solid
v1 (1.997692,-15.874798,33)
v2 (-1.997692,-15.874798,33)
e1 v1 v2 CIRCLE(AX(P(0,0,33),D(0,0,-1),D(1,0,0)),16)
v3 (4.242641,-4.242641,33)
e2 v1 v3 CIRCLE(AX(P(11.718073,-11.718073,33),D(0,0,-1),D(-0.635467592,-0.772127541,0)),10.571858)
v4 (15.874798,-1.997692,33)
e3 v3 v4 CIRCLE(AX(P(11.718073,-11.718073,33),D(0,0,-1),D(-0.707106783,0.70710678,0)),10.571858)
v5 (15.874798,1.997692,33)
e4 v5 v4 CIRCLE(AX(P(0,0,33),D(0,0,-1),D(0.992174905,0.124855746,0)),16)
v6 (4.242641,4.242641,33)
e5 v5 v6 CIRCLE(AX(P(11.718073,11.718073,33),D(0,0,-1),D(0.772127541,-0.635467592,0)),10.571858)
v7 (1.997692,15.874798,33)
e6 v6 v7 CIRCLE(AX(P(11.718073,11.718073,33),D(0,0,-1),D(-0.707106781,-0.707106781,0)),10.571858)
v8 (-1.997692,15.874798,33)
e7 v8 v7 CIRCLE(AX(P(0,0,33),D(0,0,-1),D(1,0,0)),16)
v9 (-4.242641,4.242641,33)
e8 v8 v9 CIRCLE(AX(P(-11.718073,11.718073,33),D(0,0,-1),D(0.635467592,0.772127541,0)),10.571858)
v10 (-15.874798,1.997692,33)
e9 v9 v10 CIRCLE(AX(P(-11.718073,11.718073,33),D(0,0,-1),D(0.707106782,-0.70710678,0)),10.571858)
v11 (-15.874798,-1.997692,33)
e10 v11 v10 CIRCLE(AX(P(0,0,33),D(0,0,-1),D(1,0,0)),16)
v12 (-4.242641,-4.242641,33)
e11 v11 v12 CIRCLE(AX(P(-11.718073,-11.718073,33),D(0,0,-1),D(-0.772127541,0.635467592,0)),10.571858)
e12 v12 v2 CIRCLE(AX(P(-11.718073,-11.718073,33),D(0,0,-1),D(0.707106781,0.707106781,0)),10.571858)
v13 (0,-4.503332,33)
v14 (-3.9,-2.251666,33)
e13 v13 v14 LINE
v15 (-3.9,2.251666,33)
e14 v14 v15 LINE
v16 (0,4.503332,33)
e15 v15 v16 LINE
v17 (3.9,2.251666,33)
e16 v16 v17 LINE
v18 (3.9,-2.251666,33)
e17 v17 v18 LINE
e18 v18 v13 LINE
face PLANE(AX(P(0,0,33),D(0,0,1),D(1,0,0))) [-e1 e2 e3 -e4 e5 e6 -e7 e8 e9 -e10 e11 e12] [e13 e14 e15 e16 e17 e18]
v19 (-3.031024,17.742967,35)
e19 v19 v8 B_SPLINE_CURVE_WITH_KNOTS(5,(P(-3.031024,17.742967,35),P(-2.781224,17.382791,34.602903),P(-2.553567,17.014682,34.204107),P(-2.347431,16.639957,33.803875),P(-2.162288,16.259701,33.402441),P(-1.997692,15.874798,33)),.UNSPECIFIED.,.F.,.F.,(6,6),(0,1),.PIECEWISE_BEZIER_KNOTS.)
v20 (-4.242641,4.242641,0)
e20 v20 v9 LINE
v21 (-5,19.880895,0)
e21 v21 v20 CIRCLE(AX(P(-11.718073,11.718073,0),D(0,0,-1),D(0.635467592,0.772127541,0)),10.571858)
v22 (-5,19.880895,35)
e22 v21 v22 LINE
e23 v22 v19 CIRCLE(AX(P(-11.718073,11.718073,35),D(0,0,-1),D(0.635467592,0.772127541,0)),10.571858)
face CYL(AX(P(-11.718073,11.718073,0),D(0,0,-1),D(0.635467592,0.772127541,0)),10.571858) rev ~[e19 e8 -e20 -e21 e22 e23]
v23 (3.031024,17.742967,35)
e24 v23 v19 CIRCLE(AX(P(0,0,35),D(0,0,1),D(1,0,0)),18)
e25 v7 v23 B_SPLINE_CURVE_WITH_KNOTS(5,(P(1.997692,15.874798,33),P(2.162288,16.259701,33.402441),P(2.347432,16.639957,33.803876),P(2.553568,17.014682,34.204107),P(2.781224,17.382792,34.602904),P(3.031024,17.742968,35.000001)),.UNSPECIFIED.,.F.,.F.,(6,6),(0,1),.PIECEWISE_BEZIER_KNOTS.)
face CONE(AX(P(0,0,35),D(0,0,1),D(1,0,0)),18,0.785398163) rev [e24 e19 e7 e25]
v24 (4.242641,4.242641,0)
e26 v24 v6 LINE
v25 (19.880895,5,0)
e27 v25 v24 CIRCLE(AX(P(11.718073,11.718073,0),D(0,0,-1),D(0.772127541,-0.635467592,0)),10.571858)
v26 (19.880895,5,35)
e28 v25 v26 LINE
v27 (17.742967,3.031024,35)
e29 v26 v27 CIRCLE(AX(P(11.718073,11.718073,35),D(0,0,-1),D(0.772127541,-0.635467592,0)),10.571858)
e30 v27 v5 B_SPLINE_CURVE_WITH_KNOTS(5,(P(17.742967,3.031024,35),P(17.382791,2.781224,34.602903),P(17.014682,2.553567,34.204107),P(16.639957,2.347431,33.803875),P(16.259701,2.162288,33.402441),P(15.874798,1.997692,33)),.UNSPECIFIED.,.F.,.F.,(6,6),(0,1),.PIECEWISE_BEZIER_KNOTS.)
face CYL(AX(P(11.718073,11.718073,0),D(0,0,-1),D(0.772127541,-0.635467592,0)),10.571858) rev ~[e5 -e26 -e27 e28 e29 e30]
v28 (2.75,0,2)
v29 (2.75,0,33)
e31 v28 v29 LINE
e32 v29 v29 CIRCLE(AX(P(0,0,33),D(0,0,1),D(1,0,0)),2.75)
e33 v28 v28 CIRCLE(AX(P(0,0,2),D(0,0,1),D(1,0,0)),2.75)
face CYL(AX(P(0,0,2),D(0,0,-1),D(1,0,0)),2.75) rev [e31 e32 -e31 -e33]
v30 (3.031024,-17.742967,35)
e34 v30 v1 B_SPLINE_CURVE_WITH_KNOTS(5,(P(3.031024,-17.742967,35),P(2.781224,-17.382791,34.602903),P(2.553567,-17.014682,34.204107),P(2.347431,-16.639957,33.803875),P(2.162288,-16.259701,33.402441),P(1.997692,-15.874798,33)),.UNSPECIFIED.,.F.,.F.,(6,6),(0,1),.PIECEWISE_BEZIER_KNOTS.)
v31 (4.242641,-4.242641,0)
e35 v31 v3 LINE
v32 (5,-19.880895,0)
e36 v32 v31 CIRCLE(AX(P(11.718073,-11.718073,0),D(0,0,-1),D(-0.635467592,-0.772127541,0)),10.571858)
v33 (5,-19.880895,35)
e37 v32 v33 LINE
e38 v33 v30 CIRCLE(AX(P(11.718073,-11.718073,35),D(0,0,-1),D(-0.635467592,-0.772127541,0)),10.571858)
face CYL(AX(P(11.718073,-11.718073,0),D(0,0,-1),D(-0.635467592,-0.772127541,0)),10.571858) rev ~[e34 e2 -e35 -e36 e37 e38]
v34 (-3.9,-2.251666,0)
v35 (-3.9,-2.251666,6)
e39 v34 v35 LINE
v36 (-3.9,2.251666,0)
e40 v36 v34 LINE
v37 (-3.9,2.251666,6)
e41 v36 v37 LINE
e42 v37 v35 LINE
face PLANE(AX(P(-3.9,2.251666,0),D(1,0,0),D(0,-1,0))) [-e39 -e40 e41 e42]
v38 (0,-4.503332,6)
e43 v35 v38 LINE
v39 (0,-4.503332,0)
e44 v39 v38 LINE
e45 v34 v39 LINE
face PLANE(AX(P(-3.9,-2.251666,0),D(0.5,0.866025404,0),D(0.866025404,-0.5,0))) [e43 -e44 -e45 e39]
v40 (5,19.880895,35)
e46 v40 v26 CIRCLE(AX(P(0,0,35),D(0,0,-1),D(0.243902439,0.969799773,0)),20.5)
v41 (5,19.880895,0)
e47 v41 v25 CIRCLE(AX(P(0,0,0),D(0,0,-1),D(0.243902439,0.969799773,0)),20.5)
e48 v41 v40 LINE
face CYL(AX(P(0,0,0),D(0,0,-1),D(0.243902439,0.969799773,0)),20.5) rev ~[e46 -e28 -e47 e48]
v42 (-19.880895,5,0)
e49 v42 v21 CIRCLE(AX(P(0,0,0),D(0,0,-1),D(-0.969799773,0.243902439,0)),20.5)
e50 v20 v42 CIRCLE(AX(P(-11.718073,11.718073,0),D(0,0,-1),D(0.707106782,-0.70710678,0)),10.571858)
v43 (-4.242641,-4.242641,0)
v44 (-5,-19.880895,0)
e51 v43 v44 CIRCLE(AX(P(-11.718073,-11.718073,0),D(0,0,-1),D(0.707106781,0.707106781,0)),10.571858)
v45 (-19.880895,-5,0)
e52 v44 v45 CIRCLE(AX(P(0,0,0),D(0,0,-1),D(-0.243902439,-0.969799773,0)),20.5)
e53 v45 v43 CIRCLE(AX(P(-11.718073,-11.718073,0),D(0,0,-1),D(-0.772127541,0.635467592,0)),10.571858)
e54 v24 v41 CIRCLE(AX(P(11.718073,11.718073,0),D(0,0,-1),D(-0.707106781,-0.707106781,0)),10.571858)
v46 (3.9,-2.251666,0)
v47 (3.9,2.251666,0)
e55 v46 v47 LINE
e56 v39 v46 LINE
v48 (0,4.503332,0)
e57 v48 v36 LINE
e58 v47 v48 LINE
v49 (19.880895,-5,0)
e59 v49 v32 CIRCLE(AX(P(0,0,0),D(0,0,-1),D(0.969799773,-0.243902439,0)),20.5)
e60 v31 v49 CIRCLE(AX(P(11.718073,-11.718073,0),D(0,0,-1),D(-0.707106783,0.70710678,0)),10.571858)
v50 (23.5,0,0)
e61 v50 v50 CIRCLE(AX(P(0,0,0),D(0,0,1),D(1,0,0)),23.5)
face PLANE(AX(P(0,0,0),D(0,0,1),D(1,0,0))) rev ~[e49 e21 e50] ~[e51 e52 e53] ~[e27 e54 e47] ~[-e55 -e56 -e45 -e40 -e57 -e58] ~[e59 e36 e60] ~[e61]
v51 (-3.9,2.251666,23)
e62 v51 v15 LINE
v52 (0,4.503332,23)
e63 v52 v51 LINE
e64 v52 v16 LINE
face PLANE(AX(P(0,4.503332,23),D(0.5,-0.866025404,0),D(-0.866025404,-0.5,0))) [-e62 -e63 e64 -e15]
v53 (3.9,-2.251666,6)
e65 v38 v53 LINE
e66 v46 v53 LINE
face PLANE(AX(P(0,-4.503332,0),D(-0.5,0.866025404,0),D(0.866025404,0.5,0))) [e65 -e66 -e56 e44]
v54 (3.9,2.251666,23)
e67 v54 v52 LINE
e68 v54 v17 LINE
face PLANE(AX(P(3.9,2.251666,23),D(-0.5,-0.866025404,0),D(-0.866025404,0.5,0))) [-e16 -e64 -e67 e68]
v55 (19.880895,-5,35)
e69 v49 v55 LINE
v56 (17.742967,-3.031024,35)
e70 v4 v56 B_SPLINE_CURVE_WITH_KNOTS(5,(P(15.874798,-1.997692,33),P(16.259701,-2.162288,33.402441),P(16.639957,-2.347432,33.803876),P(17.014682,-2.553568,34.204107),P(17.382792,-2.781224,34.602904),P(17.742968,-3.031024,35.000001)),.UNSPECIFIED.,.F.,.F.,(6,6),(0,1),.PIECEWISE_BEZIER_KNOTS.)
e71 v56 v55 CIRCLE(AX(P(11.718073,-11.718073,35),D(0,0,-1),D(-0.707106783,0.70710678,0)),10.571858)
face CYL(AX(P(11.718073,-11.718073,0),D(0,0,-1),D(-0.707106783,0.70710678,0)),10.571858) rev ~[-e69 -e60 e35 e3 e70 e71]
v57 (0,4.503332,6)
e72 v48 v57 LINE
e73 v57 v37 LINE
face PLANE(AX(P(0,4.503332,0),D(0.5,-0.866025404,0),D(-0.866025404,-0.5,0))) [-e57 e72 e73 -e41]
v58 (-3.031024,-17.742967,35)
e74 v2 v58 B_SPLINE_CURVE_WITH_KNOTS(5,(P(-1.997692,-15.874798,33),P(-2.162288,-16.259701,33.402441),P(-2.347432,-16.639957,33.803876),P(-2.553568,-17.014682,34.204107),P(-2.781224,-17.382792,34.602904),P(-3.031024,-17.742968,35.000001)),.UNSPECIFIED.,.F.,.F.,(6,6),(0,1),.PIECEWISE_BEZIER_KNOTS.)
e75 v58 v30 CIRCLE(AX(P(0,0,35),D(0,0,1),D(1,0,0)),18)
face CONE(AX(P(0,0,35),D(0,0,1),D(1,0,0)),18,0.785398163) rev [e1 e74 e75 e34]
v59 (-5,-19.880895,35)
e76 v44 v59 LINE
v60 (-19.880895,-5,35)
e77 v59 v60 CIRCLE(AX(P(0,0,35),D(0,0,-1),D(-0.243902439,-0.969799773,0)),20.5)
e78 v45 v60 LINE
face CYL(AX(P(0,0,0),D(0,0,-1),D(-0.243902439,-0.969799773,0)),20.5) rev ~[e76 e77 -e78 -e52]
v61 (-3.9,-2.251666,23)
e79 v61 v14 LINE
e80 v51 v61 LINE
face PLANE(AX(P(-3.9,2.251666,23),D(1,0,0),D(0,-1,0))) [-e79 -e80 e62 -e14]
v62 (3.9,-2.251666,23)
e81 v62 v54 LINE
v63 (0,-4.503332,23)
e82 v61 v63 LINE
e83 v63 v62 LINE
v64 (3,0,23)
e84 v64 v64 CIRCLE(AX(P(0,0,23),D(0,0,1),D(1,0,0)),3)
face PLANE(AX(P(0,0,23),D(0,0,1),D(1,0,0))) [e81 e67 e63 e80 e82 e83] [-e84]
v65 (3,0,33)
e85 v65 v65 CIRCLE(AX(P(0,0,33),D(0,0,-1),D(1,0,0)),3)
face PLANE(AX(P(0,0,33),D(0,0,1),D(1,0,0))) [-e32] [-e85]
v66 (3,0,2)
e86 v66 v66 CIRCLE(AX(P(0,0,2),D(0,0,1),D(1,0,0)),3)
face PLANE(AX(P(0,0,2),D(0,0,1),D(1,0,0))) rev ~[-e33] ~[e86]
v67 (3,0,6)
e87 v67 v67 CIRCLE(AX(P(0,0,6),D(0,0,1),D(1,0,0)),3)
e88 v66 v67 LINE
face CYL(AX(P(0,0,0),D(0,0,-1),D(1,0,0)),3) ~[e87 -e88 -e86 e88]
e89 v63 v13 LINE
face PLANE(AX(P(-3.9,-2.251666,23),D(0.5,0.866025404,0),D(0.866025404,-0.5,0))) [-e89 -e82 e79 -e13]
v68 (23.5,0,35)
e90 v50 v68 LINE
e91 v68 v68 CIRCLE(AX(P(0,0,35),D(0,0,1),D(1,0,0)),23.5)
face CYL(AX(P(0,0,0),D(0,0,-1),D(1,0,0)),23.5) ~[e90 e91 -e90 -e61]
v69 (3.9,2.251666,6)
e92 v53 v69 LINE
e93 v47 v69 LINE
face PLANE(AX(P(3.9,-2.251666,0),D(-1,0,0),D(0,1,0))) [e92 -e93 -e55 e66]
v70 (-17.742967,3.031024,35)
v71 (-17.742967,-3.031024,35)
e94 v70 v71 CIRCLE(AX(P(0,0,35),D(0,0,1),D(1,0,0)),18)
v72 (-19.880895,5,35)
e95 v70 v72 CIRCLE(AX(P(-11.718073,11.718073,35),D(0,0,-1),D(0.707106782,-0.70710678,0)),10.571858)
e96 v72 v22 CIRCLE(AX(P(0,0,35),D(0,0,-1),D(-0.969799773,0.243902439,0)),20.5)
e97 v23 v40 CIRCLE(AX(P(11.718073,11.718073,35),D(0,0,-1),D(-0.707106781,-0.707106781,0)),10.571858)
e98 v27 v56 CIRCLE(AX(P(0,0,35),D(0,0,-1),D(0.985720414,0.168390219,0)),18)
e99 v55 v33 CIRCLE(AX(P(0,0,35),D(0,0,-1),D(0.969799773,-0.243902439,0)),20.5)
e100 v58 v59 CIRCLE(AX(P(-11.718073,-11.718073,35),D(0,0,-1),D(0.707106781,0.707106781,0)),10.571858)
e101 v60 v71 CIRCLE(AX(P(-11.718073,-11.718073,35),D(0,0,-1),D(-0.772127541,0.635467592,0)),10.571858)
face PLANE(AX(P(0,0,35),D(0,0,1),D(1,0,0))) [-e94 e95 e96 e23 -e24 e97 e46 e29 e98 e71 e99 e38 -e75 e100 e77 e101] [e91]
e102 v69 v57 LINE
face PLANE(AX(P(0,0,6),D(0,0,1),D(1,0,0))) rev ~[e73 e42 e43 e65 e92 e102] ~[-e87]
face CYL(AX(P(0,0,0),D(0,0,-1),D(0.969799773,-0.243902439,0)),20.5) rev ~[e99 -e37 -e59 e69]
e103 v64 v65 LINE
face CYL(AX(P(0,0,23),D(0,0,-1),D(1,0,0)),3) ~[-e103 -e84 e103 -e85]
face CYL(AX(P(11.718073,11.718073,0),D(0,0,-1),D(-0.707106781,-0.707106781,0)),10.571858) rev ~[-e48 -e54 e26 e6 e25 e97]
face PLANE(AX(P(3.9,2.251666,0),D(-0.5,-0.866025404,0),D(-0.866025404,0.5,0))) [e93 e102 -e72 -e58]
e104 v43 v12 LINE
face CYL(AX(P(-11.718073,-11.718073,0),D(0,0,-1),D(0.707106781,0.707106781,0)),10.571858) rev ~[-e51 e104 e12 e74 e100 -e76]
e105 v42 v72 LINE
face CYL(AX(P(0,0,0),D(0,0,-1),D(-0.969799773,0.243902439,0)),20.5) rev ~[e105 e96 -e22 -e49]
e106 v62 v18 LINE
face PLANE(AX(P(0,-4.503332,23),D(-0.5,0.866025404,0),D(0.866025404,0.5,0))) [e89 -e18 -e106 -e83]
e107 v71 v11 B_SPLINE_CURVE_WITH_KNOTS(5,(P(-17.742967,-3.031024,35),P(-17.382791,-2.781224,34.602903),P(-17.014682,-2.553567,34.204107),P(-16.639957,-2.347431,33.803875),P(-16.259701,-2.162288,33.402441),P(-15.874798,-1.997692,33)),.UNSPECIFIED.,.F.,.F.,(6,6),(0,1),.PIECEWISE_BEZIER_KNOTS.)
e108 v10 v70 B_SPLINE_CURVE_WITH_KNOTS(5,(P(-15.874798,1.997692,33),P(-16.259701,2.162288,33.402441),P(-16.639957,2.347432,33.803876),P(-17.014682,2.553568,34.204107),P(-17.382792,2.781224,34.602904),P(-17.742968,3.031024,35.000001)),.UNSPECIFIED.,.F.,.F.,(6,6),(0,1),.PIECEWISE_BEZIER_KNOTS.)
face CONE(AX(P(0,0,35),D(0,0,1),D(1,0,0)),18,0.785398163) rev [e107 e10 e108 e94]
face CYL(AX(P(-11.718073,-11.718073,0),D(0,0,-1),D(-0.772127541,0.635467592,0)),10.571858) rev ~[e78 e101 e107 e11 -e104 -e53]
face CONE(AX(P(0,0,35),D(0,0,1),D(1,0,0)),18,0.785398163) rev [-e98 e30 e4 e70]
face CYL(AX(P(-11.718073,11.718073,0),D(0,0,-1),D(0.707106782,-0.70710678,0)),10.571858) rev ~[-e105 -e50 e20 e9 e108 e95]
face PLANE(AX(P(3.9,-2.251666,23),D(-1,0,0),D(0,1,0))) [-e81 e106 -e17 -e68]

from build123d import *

# Parameters (mm, degrees)
F0_R     = 23.5
F0_R_2   = 22.5
F0_R_3   = 3
F1_DEPTH = 35
F2_START = 2
F0_R_4   = 2.75
F2_DEPTH = 31
F4_DEPTH = 6
F5_START = 23
F5_DEPTH = 12


# Not quite as in the source:
# - a fillet or chamfer that OpenCascade refuses, or shapes differently, is made with other operations: its cross-section is extruded or revolved along the edge and cut away or added


with BuildPart() as f1:
    # F0 (on Top) → F1 (new body)
    with BuildSketch(Plane.XY):
        Circle(F0_R)
        Circle(F0_R_2, mode=Mode.SUBTRACT)
        Circle(F0_R_2)
        with BuildLine():
            ThreePointArc((19.8808953521, 5), (20.3446351002, 2.5190916302), (20.5, 0))
            ThreePointArc((20.5, 0), (20.3446351002, -2.5190916302), (19.8808953521, -5))
            ThreePointArc((19.8808953521, -5), (14.4956890143, -14.4956890143), (5, -19.8808953521))
            ThreePointArc((5, -19.8808953521), (0, -20.5), (-5, -19.8808953521))
            ThreePointArc((-5, -19.8808953521), (-14.4956890143, -14.4956890143), (-19.8808953521, -5))
            ThreePointArc((-19.8808953521, -5), (-20.5, 0), (-19.8808953521, 5))
            ThreePointArc((-19.8808953521, 5), (-14.4956890143, 14.4956890143), (-5, 19.8808953521))
            ThreePointArc((-5, 19.8808953521), (0, 20.5), (5, 19.8808953521))
            ThreePointArc((5, 19.8808953521), (14.4956890143, 14.4956890143), (19.8808953521, 5))
        make_face(mode=Mode.SUBTRACT)
        with BuildLine():
            ThreePointArc((6, 0), (5.5432771953, 2.2961005937), (4.2426406878, 4.2426406864))
            ThreePointArc((4.2426406878, 4.2426406864), (7.8e-09, 6), (-4.2426406768, 4.2426406974))
            ThreePointArc((-4.2426406768, 4.2426406974), (-6, 7.9e-09), (-4.242640688, -4.2426406862))
            ThreePointArc((-4.242640688, -4.2426406862), (-1.21e-08, -6), (4.2426406709, -4.2426407033))
            ThreePointArc((4.2426406709, -4.2426407033), (5.5432771907, -2.2961006048), (6, 0))
        make_face()
        Polygon((-3.9, -2.2516660498), (-3.9, 2.2516660498), (0, 4.5033320997), (3.9, 2.2516660498), (3.9, -2.2516660498), (0, -4.5033320997), align=None, mode=Mode.SUBTRACT)
        with BuildLine():
            ThreePointArc((4.2426406878, 4.2426406864), (1.1585914251, 12.2294676794), (5, 19.8808953521))
            ThreePointArc((5, 19.8808953521), (0, 20.5), (-5, 19.8808953521))
            ThreePointArc((-5, 19.8808953521), (-1.1585914255, 12.2294676871), (-4.2426406768, 4.2426406974))
            ThreePointArc((-4.2426406768, 4.2426406974), (7.8e-09, 6), (4.2426406878, 4.2426406864))
        make_face()
        with BuildLine():
            ThreePointArc((19.8808953521, -5), (20.3446351002, -2.5190916302), (20.5, 0))
            ThreePointArc((20.5, 0), (20.3446351002, 2.5190916302), (19.8808953521, 5))
            ThreePointArc((19.8808953521, 5), (12.2294676803, 1.1585914252), (4.2426406878, 4.2426406864))
            ThreePointArc((4.2426406878, 4.2426406864), (5.5432771953, 2.2961005937), (6, 0))
            ThreePointArc((6, 0), (5.5432771907, -2.2961006048), (4.2426406709, -4.2426407033))
            ThreePointArc((4.2426406709, -4.2426407033), (12.2294676684, -1.1585914246), (19.8808953521, -5))
        make_face()
        with BuildLine():
            ThreePointArc((-5, -19.8808953521), (0, -20.5), (5, -19.8808953521))
            ThreePointArc((5, -19.8808953521), (1.1585914257, -12.2294676913), (4.2426406709, -4.2426407033))
            ThreePointArc((4.2426406709, -4.2426407033), (-1.21e-08, -6), (-4.242640688, -4.2426406862))
            ThreePointArc((-4.242640688, -4.2426406862), (-1.1585914251, -12.2294676792), (-5, -19.8808953521))
        make_face()
        with BuildLine():
            ThreePointArc((-4.242640688, -4.2426406862), (-6, 7.9e-09), (-4.2426406768, 4.2426406974))
            ThreePointArc((-4.2426406768, 4.2426406974), (-12.2294676726, 1.1585914248), (-19.8808953521, 5))
            ThreePointArc((-19.8808953521, 5), (-20.5, 0), (-19.8808953521, -5))
            ThreePointArc((-19.8808953521, -5), (-12.2294676805, -1.1585914252), (-4.242640688, -4.2426406862))
        make_face()
        Polygon((0, 4.5033320997), (-3.9, 2.2516660498), (-3.9, -2.2516660498), (0, -4.5033320997), (3.9, -2.2516660498), (3.9, 2.2516660498), align=None)
        Circle(F0_R_3, mode=Mode.SUBTRACT)
    extrude(amount=F1_DEPTH)

    # F0 (on Top) → F2 (join)
    with BuildSketch(Plane.XY.offset(F2_START)):
        Circle(F0_R_3)
        Circle(F0_R_4, mode=Mode.SUBTRACT)
    extrude(amount=F2_DEPTH)

    # F3: chamfer of 15 on 1 edges, made by hand


with BuildPart() as f3_tool2:
    # F3_s3 → F3_t4 (revolve)
    with BuildSketch(Plane.XZ):
        Polygon((18, 35), (3, 20), (3, 35), align=None)
    revolve(axis=Axis((0, 0, 35), (0, 0, 1)))

    split(bisect_by=Plane.XY.offset(33), keep=Keep.TOP)


with BuildPart() as f1_1:
    add(f1.part)

    # F3_t1: cut F3_tool2
    add(f3_tool2.part, mode=Mode.SUBTRACT)

    # F0 (on Top) → F4 (cut)
    with BuildSketch(Plane.XY):
        Polygon((0, 4.5033320997), (-3.9, 2.2516660498), (-3.9, -2.2516660498), (0, -4.5033320997), (3.9, -2.2516660498), (3.9, 2.2516660498), align=None)
        Circle(F0_R_3, mode=Mode.SUBTRACT)
    extrude(amount=F4_DEPTH, mode=Mode.SUBTRACT)

    # F0 (on Top) → F5 (cut)
    with BuildSketch(Plane.XY.offset(F5_START)):
        Polygon((0, 4.5033320997), (-3.9, 2.2516660498), (-3.9, -2.2516660498), (0, -4.5033320997), (3.9, -2.2516660498), (3.9, 2.2516660498), align=None)
        Circle(F0_R_3, mode=Mode.SUBTRACT)
    extrude(amount=F5_DEPTH, mode=Mode.SUBTRACT)


solid = f1_1.part
